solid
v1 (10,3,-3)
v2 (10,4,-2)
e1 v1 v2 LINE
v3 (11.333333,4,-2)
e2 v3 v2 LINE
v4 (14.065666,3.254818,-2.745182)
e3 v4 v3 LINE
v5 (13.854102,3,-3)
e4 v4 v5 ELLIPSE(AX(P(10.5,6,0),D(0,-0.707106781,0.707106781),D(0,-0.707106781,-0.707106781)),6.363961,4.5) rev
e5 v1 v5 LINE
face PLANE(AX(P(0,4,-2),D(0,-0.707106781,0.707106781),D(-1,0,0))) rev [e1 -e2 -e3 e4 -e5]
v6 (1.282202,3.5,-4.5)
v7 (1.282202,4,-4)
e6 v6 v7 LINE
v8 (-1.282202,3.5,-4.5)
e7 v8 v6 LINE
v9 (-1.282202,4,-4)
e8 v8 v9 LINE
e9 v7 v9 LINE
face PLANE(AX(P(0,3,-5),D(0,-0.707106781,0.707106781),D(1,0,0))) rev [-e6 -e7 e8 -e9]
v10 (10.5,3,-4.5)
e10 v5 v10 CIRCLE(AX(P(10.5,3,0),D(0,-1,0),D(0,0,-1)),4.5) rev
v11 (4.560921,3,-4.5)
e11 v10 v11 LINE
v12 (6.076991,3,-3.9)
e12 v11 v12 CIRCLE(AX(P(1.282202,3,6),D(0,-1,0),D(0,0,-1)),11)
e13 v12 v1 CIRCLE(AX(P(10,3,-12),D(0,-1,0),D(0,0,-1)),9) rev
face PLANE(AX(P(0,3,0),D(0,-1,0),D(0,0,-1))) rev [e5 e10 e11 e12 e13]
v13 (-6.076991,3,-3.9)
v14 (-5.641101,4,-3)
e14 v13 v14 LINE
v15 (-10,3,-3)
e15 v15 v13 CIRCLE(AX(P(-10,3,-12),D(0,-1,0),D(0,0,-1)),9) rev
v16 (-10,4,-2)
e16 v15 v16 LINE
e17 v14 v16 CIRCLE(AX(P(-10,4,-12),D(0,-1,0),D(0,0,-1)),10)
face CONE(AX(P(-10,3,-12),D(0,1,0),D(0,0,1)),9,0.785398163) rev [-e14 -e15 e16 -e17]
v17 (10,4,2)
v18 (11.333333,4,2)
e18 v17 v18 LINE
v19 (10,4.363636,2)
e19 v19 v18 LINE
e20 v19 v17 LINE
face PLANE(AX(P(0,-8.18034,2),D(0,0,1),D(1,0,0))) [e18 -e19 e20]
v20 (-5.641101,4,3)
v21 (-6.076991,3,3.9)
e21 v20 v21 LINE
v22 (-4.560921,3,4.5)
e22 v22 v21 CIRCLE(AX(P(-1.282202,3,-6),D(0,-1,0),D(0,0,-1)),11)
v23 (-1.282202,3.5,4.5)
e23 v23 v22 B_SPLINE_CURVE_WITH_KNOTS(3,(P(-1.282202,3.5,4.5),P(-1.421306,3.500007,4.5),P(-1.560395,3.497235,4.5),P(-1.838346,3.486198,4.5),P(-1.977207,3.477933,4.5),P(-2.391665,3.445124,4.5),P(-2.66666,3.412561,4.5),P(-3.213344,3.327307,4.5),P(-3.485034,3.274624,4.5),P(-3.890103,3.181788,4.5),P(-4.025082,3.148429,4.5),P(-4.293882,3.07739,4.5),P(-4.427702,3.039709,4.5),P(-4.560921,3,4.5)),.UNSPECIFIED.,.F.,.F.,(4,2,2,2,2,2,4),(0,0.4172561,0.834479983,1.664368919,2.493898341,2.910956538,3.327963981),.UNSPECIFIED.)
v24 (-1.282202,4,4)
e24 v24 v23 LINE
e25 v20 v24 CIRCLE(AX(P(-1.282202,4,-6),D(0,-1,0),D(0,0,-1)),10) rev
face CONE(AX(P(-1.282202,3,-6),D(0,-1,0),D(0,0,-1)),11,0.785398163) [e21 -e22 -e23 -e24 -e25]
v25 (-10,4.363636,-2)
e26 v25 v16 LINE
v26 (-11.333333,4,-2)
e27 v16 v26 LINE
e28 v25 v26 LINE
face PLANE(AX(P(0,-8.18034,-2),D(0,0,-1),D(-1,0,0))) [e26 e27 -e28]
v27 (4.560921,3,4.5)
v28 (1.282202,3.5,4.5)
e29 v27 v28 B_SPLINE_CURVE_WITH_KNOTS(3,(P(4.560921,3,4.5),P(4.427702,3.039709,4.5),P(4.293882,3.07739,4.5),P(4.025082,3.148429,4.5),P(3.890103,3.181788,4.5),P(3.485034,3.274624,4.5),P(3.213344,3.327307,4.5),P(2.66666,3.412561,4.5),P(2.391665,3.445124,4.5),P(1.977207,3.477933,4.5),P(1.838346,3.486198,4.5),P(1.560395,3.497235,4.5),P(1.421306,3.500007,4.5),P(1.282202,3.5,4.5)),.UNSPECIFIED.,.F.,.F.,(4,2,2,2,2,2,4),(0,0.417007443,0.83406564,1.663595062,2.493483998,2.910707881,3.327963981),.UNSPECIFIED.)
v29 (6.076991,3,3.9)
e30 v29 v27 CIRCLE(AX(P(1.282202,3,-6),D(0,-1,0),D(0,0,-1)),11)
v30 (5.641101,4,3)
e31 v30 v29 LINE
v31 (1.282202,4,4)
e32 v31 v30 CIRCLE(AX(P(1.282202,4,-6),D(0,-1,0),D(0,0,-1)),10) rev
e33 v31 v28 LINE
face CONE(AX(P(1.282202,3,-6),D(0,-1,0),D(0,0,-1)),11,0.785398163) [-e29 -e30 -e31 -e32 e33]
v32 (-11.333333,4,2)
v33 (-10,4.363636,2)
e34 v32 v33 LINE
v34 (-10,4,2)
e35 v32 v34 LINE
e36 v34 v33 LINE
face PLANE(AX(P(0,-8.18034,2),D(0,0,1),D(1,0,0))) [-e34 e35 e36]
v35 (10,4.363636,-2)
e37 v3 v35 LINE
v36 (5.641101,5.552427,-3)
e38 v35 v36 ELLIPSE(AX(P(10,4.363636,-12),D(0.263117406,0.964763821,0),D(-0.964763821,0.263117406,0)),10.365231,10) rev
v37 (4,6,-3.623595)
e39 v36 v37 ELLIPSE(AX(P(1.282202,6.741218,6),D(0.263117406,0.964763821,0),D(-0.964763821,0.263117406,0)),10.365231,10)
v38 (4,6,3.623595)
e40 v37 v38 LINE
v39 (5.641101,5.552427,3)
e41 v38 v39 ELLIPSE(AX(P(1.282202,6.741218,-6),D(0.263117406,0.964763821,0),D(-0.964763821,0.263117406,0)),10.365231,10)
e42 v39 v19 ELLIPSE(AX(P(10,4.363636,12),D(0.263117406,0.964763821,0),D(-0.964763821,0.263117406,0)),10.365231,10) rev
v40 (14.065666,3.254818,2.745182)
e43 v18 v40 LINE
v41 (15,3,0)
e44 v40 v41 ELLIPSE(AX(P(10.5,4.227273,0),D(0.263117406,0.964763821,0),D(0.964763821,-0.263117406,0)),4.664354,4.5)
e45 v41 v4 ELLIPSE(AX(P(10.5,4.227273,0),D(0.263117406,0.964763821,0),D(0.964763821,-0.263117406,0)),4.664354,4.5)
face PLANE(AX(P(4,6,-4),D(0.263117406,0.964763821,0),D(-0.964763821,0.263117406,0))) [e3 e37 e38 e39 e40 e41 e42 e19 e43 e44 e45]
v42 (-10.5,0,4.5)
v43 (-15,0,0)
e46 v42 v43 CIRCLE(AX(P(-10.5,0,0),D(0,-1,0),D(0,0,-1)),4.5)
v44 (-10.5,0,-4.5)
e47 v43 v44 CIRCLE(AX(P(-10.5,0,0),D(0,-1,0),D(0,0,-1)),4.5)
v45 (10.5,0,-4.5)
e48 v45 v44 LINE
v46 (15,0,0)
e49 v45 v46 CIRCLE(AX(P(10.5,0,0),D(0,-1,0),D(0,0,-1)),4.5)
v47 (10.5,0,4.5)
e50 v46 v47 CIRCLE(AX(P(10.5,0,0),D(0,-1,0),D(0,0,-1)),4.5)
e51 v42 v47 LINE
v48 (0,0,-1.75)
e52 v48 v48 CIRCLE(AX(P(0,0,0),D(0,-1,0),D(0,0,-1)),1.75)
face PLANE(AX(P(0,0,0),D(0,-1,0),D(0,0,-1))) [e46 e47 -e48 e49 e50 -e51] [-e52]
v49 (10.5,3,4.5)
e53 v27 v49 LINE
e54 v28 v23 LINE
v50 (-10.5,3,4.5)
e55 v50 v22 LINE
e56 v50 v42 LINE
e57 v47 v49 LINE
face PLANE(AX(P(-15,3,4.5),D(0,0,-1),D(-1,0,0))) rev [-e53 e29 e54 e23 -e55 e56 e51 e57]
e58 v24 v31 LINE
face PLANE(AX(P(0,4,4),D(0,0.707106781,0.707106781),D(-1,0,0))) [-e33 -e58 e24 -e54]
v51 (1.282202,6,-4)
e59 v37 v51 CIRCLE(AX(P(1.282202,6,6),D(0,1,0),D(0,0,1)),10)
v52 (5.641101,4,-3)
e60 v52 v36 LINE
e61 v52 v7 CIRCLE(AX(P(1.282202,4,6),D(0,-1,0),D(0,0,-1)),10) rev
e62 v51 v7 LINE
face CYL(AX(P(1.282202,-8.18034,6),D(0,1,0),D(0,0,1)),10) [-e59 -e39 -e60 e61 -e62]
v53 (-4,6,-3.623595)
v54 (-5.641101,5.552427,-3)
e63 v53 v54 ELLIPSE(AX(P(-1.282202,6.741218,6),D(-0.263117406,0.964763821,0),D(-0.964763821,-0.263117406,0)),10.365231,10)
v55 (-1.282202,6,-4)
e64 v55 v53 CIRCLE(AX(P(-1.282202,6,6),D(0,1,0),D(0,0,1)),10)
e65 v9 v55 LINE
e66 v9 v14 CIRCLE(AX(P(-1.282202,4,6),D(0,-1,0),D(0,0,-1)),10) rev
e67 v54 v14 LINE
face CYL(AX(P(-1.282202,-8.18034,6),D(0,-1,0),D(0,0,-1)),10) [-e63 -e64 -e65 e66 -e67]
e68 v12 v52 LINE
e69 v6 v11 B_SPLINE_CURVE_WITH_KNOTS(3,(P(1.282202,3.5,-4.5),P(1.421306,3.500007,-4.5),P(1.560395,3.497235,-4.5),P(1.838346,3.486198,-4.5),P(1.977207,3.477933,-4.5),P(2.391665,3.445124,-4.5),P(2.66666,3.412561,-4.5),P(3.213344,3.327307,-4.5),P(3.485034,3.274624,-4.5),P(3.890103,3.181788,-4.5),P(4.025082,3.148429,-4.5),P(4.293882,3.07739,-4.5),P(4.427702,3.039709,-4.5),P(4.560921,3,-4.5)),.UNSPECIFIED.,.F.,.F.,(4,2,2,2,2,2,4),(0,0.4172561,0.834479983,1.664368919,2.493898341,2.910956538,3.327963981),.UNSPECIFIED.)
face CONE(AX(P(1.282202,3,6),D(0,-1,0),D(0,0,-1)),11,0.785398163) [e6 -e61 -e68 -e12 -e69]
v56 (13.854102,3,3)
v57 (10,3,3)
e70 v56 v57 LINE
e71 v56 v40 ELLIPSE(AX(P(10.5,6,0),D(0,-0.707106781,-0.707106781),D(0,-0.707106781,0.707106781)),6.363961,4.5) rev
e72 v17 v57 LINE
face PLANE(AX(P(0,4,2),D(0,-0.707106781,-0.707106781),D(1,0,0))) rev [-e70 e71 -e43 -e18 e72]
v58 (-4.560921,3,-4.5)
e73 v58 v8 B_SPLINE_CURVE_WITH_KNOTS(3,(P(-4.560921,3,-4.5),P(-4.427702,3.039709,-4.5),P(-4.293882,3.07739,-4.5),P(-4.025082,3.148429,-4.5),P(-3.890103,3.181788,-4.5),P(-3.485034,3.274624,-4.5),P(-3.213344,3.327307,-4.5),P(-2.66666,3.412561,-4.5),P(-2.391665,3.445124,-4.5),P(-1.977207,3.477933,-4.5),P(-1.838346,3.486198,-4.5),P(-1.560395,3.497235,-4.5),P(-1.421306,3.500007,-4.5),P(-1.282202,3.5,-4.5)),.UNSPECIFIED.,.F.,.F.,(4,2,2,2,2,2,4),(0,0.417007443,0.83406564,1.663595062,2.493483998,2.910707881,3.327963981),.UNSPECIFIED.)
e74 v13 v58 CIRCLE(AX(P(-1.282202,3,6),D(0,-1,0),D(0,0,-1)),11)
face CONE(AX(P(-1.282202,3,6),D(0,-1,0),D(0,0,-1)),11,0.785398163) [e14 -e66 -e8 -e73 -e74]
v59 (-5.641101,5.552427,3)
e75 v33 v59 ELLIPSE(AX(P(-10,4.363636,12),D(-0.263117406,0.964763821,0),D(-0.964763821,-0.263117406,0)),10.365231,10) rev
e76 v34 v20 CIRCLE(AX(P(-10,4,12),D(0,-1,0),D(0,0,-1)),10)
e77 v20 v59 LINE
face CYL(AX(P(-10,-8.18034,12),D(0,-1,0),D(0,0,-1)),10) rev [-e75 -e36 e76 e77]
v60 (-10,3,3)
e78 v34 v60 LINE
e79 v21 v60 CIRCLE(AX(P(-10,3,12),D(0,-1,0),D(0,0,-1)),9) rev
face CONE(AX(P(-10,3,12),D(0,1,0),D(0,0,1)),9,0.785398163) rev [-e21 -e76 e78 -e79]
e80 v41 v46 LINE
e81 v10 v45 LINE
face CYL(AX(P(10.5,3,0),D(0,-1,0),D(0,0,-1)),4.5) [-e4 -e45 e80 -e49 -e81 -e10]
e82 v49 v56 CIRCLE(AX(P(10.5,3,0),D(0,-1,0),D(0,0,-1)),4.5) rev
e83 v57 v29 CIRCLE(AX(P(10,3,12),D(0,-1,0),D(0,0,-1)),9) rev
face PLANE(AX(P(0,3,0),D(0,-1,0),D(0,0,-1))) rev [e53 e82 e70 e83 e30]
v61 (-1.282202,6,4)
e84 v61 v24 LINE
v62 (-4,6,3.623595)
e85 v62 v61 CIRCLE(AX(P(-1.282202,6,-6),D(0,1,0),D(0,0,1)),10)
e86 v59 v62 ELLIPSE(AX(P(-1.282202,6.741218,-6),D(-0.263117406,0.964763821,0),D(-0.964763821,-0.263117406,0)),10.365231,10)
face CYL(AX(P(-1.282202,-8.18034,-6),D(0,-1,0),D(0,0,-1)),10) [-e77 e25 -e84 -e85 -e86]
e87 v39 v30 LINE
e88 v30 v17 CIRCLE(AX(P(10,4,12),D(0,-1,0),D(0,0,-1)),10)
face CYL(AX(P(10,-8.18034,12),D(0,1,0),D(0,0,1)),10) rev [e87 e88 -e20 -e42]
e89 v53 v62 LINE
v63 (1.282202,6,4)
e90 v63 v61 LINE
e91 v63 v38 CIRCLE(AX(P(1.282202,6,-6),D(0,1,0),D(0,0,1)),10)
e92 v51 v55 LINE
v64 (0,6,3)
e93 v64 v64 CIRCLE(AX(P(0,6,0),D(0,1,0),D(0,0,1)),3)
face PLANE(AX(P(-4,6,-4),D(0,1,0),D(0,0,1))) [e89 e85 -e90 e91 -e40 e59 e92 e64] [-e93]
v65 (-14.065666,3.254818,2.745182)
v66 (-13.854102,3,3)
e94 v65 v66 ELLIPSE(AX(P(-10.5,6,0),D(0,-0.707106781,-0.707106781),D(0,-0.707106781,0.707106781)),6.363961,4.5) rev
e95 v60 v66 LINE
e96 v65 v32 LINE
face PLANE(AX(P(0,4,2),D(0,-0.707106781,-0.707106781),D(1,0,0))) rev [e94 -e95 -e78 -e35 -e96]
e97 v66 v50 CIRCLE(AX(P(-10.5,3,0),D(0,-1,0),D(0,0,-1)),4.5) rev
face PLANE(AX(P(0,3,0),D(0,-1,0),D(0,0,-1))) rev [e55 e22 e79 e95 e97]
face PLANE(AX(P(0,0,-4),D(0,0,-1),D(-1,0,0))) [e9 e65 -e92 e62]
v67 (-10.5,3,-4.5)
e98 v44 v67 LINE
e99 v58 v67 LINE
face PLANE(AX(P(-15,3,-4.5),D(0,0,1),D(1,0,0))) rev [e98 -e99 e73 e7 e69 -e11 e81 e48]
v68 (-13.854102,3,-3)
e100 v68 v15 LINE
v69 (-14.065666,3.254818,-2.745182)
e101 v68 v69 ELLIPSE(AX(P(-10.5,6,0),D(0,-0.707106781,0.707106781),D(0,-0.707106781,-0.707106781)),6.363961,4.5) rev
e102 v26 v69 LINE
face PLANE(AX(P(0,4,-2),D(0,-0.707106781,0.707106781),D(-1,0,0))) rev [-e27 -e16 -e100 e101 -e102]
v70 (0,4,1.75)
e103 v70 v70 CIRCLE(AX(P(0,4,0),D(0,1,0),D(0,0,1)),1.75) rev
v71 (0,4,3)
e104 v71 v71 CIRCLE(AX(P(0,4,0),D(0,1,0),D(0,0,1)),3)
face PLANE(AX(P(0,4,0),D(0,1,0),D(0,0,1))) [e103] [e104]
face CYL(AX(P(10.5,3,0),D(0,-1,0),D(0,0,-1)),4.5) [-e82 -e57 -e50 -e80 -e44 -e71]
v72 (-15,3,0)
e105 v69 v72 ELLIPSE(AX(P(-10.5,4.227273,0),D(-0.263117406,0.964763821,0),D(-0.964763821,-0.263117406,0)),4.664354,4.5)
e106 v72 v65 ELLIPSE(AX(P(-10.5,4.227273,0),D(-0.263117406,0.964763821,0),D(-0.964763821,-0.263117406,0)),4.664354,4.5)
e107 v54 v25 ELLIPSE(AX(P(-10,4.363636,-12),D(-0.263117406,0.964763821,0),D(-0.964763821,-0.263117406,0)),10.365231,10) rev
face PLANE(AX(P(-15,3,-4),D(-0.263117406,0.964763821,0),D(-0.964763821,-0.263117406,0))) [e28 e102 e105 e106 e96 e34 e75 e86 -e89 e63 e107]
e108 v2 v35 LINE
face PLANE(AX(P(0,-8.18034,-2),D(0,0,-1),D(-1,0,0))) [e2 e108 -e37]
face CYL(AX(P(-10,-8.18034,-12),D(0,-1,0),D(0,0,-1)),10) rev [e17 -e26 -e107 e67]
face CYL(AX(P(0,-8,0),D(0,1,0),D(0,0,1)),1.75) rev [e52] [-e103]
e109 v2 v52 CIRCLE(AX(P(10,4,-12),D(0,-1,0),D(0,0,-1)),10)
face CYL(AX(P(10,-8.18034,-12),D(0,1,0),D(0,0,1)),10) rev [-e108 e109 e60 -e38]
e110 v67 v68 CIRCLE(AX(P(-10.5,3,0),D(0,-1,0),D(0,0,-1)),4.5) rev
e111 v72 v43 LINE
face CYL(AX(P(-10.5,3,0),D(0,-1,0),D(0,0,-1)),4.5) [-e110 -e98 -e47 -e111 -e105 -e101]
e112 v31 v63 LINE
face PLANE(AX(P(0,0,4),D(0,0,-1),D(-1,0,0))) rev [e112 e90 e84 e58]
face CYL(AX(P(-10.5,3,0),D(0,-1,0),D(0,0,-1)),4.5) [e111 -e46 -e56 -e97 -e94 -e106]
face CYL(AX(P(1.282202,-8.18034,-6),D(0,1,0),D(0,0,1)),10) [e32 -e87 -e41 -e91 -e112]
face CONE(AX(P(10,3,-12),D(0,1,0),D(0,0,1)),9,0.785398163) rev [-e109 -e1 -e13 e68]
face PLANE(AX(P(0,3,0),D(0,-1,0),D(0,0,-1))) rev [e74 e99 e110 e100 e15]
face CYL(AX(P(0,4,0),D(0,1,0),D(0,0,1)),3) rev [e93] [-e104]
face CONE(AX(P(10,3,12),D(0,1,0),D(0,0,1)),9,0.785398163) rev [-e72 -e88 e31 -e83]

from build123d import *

# Parameters (mm, degrees)
SKETCH1_W                = 30
SKETCH1_H                = 9
BOSS_EXTRUDE1_DEPTH      = 3
BOSS_EXTRUDE2_DEPTH      = 4
BOSS_EXTRUDE2_DEPTH_BACK = 4
SKETCH3_W                = 11
SKETCH3_H                = 2
CUT_EXTRUDE1_DEPTH       = 3
SKETCH5_R                = 1.75
CUT_EXTRUDE2_DEPTH       = 14
SKETCH6_R                = 3
CUT_EXTRUDE3_DEPTH       = 2
FILLET1_R                = 10
FILLET2_R                = 10
CHAMFER1_SIZE            = 1
FILLET3_R                = 4.5


with BuildPart() as part:
    # Sketch1 → Boss-Extrude1 (new body)
    with BuildSketch(Plane(origin=(0, 0, 0), x_dir=(1, 0, 0), z_dir=(0, 1, 0))):
        Rectangle(SKETCH1_W, SKETCH1_H)
    extrude(amount=BOSS_EXTRUDE1_DEPTH)

    # Sketch2 → Boss-Extrude2 (add, two sides: drawn at the far end of the back side and taken through both)
    with BuildSketch(Plane.XY.offset(-BOSS_EXTRUDE2_DEPTH_BACK)):
        Polygon((-15, 3), (-4, 6), (4, 6), (15, 3), align=None)
    extrude(amount=BOSS_EXTRUDE2_DEPTH + BOSS_EXTRUDE2_DEPTH_BACK)

    # Sketch3 → Cut-Extrude1 (cut)
    with BuildSketch(Plane(origin=(0, 6, 0), x_dir=(1, 0, 0), z_dir=(0, 1, 0))):
        with Locations((9.5, 3)):
            Rectangle(SKETCH3_W, SKETCH3_H)
        with Locations((-9.5, 3)):
            Rectangle(SKETCH3_W, SKETCH3_H)
        with Locations((-9.5, -3)):
            Rectangle(SKETCH3_W, SKETCH3_H)
        with Locations((9.5, -3)):
            Rectangle(SKETCH3_W, SKETCH3_H)
    extrude(amount=-CUT_EXTRUDE1_DEPTH, mode=Mode.SUBTRACT)

    # Sketch5 → Cut-Extrude2 (cut)
    with BuildSketch(Plane(origin=(0, 6, 0), x_dir=(1, 0, 0), z_dir=(0, 1, 0))):
        with Locations(Location((0, 0, 0), (0, 0, 270))):
            Circle(SKETCH5_R)
    extrude(amount=-CUT_EXTRUDE2_DEPTH, mode=Mode.SUBTRACT)

    # Sketch6 → Cut-Extrude3 (cut)
    with BuildSketch(Plane(origin=(0, 6, 0), x_dir=(1, 0, 0), z_dir=(0, 1, 0))):
        with Locations(Location((0, 0, 0), (0, 0, 270))):
            Circle(SKETCH6_R)
    extrude(amount=-CUT_EXTRUDE3_DEPTH, mode=Mode.SUBTRACT)

    # Fillet1
    # the kernel refuses this fillet: 10 mm, written as the material it adds along each edge
    with BuildSketch(Plane(origin=(-4, 21, -2), x_dir=(-1, 0, 0), z_dir=(0, -1, 0))) as fillet1_piece_1_section:
        with BuildLine():
            CenterArc((6, 10), FILLET1_R, 233.130102354, 36.869897646)
            Line((0, 2), (0, 0))
            Line((0, 0), (6, 0))
        make_face()
    fillet1_piece_1 = extrude(amount=18, mode=Mode.PRIVATE)
    fillet1_piece_1 = split(fillet1_piece_1, bisect_by=Plane(origin=(-0.192307692, 7.038461538, -2), z_dir=(0.2631174057921088, -0.9647638212377322, 0)), keep=Keep.TOP, mode=Mode.PRIVATE)
    add(fillet1_piece_1)
    with BuildSketch(Plane(origin=(4, 21, -2), x_dir=(0, 0, -1), z_dir=(0, -1, 0))) as fillet1_piece_2_section:
        with BuildLine():
            CenterArc((10, 6), FILLET1_R, 180, 36.869897646)
            Line((0, 6), (0, 0))
            Line((0, 0), (2, 0))
        make_face()
    fillet1_piece_2 = extrude(amount=18, mode=Mode.PRIVATE)
    fillet1_piece_2 = split(fillet1_piece_2, bisect_by=Plane(origin=(0.192307692, 7.038461538, -2), z_dir=(-0.2631174057921089, -0.9647638212377321, 0)), keep=Keep.TOP, mode=Mode.PRIVATE)
    add(fillet1_piece_2)
    with BuildSketch(Plane(origin=(4, 21, 2), x_dir=(1, 0, 0), z_dir=(0, -1, 0))) as fillet1_piece_3_section:
        with BuildLine():
            CenterArc((6, 10), FILLET1_R, 233.130102354, 36.869897646)
            Line((0, 2), (0, 0))
            Line((0, 0), (6, 0))
        make_face()
    fillet1_piece_3 = extrude(amount=18, mode=Mode.PRIVATE)
    fillet1_piece_3 = split(fillet1_piece_3, bisect_by=Plane(origin=(0.192307692, 7.038461538, 2), z_dir=(-0.2631174057921089, -0.9647638212377321, 0)), keep=Keep.TOP, mode=Mode.PRIVATE)
    add(fillet1_piece_3)
    with BuildSketch(Plane(origin=(-4, 21, 2), x_dir=(0, 0, 1), z_dir=(0, -1, 0))) as fillet1_piece_4_section:
        with BuildLine():
            CenterArc((10, 6), FILLET1_R, 180, 36.869897646)
            Line((0, 6), (0, 0))
            Line((0, 0), (2, 0))
        make_face()
    fillet1_piece_4 = extrude(amount=18, mode=Mode.PRIVATE)
    fillet1_piece_4 = split(fillet1_piece_4, bisect_by=Plane(origin=(-0.192307692, 7.038461538, 2), z_dir=(0.2631174057921088, -0.9647638212377322, 0)), keep=Keep.TOP, mode=Mode.PRIVATE)
    add(fillet1_piece_4)

    # Fillet2
    fillet2_edges = [part.edges().sort_by_distance(p)[0] for p in [
        (-4, 4.5, -4),
        (4, 4.5, -4),
        (4, 4.5, 4),
        (-4, 4.5, 4),
    ]]
    fillet(fillet2_edges, radius=FILLET2_R)

    # Chamfer1
    # the kernel refuses this chamfer: 1 mm, written as the material it adds along each edge
    with BuildSketch(Plane(origin=(1.282202113, 3, -4), x_dir=(0, 1, 0), z_dir=(-1, 0, 0))) as chamfer1_piece_1_section:
        Polygon((CHAMFER1_SIZE, 0), (0, CHAMFER1_SIZE), (0, 0), align=None)
    chamfer1_piece_1 = extrude(amount=2.564404226, mode=Mode.PRIVATE)
    chamfer1_piece_1 = split(chamfer1_piece_1, bisect_by=Plane(origin=(1.282202113, 3, -4.5), z_dir=(0, 0, 1)), keep=Keep.TOP, mode=Mode.PRIVATE)
    add(chamfer1_piece_1)
    with BuildSketch(Plane(origin=(10, 3, -12), x_dir=(0, 0, 1), z_dir=(1, 0, 0))) as chamfer1_piece_2:
        Polygon((10 - CHAMFER1_SIZE, 0), (10, -CHAMFER1_SIZE), (10, 0), align=None)
    revolve(axis=Axis((10, 3, -12), (0, -1, 0)), revolution_arc=25.841932763)
    with BuildSketch(Plane(origin=(1.282202113, 3, 4), x_dir=(0, 0, 1), z_dir=(-1, 0, 0))) as chamfer1_piece_3_section:
        Polygon((CHAMFER1_SIZE, 0), (0, CHAMFER1_SIZE), (0, 0), align=None)
    chamfer1_piece_3 = extrude(amount=2.564404226, mode=Mode.PRIVATE)
    chamfer1_piece_3 = split(chamfer1_piece_3, bisect_by=Plane(origin=(1.282202113, 3, 4.5), z_dir=(0, 0, -1)), keep=Keep.TOP, mode=Mode.PRIVATE)
    add(chamfer1_piece_3)
    with BuildSketch(Plane(origin=(-10, 3, 12), x_dir=(0, 0, -1), z_dir=(-1, 0, 0))) as chamfer1_piece_4:
        Polygon((10, -CHAMFER1_SIZE), (10 - CHAMFER1_SIZE, 0), (10, 0), align=None)
    revolve(axis=Axis((-10, 3, 12), (0, -1, 0)), revolution_arc=25.841932763)
    with BuildSketch(Plane(origin=(-1.282202113, 3, 6), x_dir=(0, 0, -1), z_dir=(1, 0, 0))) as chamfer1_piece_5_section:
        Polygon((10, CHAMFER1_SIZE), (10 + CHAMFER1_SIZE, 0), (10, 0), align=None)
    chamfer1_piece_5 = revolve(axis=Axis((-1.282202113, 3, 6), (0, 1, 0)), revolution_arc=25.841932763, mode=Mode.PRIVATE)
    chamfer1_piece_5 = split(chamfer1_piece_5, bisect_by=Plane(origin=(-1.282202113, 3, -4.5), z_dir=(0, 0, 1)), keep=Keep.TOP, mode=Mode.PRIVATE)
    add(chamfer1_piece_5)
    with BuildSketch(Plane(origin=(1.282202113, 3, 6), x_dir=(0, 0, -1), z_dir=(-1, 0, 0))) as chamfer1_piece_6_section:
        Polygon((10, -CHAMFER1_SIZE), (10 + CHAMFER1_SIZE, 0), (10, 0), align=None)
    chamfer1_piece_6 = revolve(axis=Axis((1.282202113, 3, 6), (0, -1, 0)), revolution_arc=25.841932763, mode=Mode.PRIVATE)
    chamfer1_piece_6 = split(chamfer1_piece_6, bisect_by=Plane(origin=(1.282202113, 3, -4.5), z_dir=(0, 0, 1)), keep=Keep.TOP, mode=Mode.PRIVATE)
    add(chamfer1_piece_6)
    with BuildSketch(Plane(origin=(1.282202113, 3, -6), x_dir=(0.43588989435406694, 0, 0.9000000000000001), z_dir=(0.9000000000000001, 0, -0.43588989435406694))) as chamfer1_piece_7_section:
        Polygon((10 + CHAMFER1_SIZE, 0), (10, -CHAMFER1_SIZE), (10, 0), align=None)
    chamfer1_piece_7 = revolve(axis=Axis((1.282202113, 3, -6), (0, -1, 0)), revolution_arc=25.841932763, mode=Mode.PRIVATE)
    chamfer1_piece_7 = split(chamfer1_piece_7, bisect_by=Plane(origin=(1.282202113, 3, 4.5), z_dir=(0, 0, -1)), keep=Keep.TOP, mode=Mode.PRIVATE)
    add(chamfer1_piece_7)
    with BuildSketch(Plane(origin=(-1.282202113, 3, -6), x_dir=(-0.4358898943539643, 0, 0.9000000000000499), z_dir=(-0.9000000000000499, 0, -0.4358898943539643))) as chamfer1_piece_8_section:
        Polygon((10, CHAMFER1_SIZE), (10 + CHAMFER1_SIZE, 0), (10, 0), align=None)
    chamfer1_piece_8 = revolve(axis=Axis((-1.282202113, 3, -6), (0, 1, 0)), revolution_arc=25.841932763, mode=Mode.PRIVATE)
    chamfer1_piece_8 = split(chamfer1_piece_8, bisect_by=Plane(origin=(-1.282202113, 3, 4.5), z_dir=(0, 0, -1)), keep=Keep.TOP, mode=Mode.PRIVATE)
    add(chamfer1_piece_8)
    with BuildSketch(Plane(origin=(-10, 3, 2), x_dir=(0, 1, 0), z_dir=(-1, 0, 0))) as chamfer1_piece_9_section:
        Polygon((CHAMFER1_SIZE, 0), (0, -CHAMFER1_SIZE), (0, 0), align=None)
    chamfer1_piece_9 = extrude(amount=5, mode=Mode.PRIVATE)
    chamfer1_piece_9 = split(chamfer1_piece_9, bisect_by=Plane(origin=(-10.346153846, 4.269230769, 2), z_dir=(0.2631174057919396, -0.9647638212377784, 0)), keep=Keep.TOP, mode=Mode.PRIVATE)
    add(chamfer1_piece_9)
    with BuildSketch(Plane(origin=(10, 3, -2), x_dir=(0, 0, -1), z_dir=(1, 0, 0))) as chamfer1_piece_10_section:
        Polygon((CHAMFER1_SIZE, 0), (0, CHAMFER1_SIZE), (0, 0), align=None)
    chamfer1_piece_10 = extrude(amount=5, mode=Mode.PRIVATE)
    chamfer1_piece_10 = split(chamfer1_piece_10, bisect_by=Plane(origin=(10.346153846, 4.269230769, -2), z_dir=(-0.2631174057919396, -0.9647638212377784, 0)), keep=Keep.TOP, mode=Mode.PRIVATE)
    add(chamfer1_piece_10)
    with BuildSketch(Plane(origin=(-15, 3, -2), x_dir=(0, 1, 0), z_dir=(1, 0, 0))) as chamfer1_piece_11_section:
        Polygon((CHAMFER1_SIZE, 0), (0, -CHAMFER1_SIZE), (0, 0), align=None)
    chamfer1_piece_11 = extrude(amount=5, mode=Mode.PRIVATE)
    chamfer1_piece_11 = split(chamfer1_piece_11, bisect_by=Plane(origin=(-15, 3, -2), z_dir=(0.2631174057919396, -0.9647638212377784, 0)), keep=Keep.TOP, mode=Mode.PRIVATE)
    add(chamfer1_piece_11)
    with BuildSketch(Plane(origin=(-10, 3, -12), x_dir=(0.43588989435406783, 0, 0.8999999999999998), z_dir=(0.8999999999999998, 0, -0.43588989435406783))) as chamfer1_piece_12:
        Polygon((10, -CHAMFER1_SIZE), (10 - CHAMFER1_SIZE, 0), (10, 0), align=None)
    revolve(axis=Axis((-10, 3, -12), (0, -1, 0)), revolution_arc=25.841932763)
    with BuildSketch(Plane(origin=(15, 3, 2), x_dir=(0, 0, 1), z_dir=(-1, 0, 0))) as chamfer1_piece_13_section:
        Polygon((CHAMFER1_SIZE, 0), (0, CHAMFER1_SIZE), (0, 0), align=None)
    chamfer1_piece_13 = extrude(amount=5, mode=Mode.PRIVATE)
    chamfer1_piece_13 = split(chamfer1_piece_13, bisect_by=Plane(origin=(15, 3, 2), z_dir=(-0.2631174057919396, -0.9647638212377784, 0)), keep=Keep.TOP, mode=Mode.PRIVATE)
    add(chamfer1_piece_13)
    with BuildSketch(Plane(origin=(10, 3, 12), x_dir=(-0.43588989435406783, 0, -0.8999999999999998), z_dir=(-0.8999999999999998, 0, 0.43588989435406783))) as chamfer1_piece_14:
        Polygon((10 - CHAMFER1_SIZE, 0), (10, -CHAMFER1_SIZE), (10, 0), align=None)
    revolve(axis=Axis((10, 3, 12), (0, -1, 0)), revolution_arc=25.841932763)

    # Fillet3
    # the kernel refuses this fillet: 4.5 mm, written as the material it takes off along each edge
    with BuildSketch(Plane(origin=(15, -11.25, -4.5), x_dir=(0, 0, 1), z_dir=(0, 1, 0)), Plane(origin=(-15, -11.25, -4.5), x_dir=(1, 0, 0), z_dir=(0, 1, 0))) as fillet3_piece_1:
        with BuildLine():
            CenterArc((FILLET3_R, -FILLET3_R), FILLET3_R, 90, 90)
            Line((0, -FILLET3_R), (0, 0))
            Line((0, 0), (FILLET3_R, 0))
        make_face()
    extrude(amount=25.5, mode=Mode.SUBTRACT)
    with BuildSketch(Plane(origin=(15, -11.25, 4.5), x_dir=(0, 0, -1), z_dir=(0, 1, 0)), Plane(origin=(-15, -11.25, 4.5), x_dir=(1, 0, 0), z_dir=(0, 1, 0))) as fillet3_piece_2:
        with BuildLine():
            CenterArc((FILLET3_R, FILLET3_R), FILLET3_R, 180, 90)
            Line((0, FILLET3_R), (0, 0))
            Line((0, 0), (FILLET3_R, 0))
        make_face()
    extrude(amount=25.5, mode=Mode.SUBTRACT)


solid = part.part
